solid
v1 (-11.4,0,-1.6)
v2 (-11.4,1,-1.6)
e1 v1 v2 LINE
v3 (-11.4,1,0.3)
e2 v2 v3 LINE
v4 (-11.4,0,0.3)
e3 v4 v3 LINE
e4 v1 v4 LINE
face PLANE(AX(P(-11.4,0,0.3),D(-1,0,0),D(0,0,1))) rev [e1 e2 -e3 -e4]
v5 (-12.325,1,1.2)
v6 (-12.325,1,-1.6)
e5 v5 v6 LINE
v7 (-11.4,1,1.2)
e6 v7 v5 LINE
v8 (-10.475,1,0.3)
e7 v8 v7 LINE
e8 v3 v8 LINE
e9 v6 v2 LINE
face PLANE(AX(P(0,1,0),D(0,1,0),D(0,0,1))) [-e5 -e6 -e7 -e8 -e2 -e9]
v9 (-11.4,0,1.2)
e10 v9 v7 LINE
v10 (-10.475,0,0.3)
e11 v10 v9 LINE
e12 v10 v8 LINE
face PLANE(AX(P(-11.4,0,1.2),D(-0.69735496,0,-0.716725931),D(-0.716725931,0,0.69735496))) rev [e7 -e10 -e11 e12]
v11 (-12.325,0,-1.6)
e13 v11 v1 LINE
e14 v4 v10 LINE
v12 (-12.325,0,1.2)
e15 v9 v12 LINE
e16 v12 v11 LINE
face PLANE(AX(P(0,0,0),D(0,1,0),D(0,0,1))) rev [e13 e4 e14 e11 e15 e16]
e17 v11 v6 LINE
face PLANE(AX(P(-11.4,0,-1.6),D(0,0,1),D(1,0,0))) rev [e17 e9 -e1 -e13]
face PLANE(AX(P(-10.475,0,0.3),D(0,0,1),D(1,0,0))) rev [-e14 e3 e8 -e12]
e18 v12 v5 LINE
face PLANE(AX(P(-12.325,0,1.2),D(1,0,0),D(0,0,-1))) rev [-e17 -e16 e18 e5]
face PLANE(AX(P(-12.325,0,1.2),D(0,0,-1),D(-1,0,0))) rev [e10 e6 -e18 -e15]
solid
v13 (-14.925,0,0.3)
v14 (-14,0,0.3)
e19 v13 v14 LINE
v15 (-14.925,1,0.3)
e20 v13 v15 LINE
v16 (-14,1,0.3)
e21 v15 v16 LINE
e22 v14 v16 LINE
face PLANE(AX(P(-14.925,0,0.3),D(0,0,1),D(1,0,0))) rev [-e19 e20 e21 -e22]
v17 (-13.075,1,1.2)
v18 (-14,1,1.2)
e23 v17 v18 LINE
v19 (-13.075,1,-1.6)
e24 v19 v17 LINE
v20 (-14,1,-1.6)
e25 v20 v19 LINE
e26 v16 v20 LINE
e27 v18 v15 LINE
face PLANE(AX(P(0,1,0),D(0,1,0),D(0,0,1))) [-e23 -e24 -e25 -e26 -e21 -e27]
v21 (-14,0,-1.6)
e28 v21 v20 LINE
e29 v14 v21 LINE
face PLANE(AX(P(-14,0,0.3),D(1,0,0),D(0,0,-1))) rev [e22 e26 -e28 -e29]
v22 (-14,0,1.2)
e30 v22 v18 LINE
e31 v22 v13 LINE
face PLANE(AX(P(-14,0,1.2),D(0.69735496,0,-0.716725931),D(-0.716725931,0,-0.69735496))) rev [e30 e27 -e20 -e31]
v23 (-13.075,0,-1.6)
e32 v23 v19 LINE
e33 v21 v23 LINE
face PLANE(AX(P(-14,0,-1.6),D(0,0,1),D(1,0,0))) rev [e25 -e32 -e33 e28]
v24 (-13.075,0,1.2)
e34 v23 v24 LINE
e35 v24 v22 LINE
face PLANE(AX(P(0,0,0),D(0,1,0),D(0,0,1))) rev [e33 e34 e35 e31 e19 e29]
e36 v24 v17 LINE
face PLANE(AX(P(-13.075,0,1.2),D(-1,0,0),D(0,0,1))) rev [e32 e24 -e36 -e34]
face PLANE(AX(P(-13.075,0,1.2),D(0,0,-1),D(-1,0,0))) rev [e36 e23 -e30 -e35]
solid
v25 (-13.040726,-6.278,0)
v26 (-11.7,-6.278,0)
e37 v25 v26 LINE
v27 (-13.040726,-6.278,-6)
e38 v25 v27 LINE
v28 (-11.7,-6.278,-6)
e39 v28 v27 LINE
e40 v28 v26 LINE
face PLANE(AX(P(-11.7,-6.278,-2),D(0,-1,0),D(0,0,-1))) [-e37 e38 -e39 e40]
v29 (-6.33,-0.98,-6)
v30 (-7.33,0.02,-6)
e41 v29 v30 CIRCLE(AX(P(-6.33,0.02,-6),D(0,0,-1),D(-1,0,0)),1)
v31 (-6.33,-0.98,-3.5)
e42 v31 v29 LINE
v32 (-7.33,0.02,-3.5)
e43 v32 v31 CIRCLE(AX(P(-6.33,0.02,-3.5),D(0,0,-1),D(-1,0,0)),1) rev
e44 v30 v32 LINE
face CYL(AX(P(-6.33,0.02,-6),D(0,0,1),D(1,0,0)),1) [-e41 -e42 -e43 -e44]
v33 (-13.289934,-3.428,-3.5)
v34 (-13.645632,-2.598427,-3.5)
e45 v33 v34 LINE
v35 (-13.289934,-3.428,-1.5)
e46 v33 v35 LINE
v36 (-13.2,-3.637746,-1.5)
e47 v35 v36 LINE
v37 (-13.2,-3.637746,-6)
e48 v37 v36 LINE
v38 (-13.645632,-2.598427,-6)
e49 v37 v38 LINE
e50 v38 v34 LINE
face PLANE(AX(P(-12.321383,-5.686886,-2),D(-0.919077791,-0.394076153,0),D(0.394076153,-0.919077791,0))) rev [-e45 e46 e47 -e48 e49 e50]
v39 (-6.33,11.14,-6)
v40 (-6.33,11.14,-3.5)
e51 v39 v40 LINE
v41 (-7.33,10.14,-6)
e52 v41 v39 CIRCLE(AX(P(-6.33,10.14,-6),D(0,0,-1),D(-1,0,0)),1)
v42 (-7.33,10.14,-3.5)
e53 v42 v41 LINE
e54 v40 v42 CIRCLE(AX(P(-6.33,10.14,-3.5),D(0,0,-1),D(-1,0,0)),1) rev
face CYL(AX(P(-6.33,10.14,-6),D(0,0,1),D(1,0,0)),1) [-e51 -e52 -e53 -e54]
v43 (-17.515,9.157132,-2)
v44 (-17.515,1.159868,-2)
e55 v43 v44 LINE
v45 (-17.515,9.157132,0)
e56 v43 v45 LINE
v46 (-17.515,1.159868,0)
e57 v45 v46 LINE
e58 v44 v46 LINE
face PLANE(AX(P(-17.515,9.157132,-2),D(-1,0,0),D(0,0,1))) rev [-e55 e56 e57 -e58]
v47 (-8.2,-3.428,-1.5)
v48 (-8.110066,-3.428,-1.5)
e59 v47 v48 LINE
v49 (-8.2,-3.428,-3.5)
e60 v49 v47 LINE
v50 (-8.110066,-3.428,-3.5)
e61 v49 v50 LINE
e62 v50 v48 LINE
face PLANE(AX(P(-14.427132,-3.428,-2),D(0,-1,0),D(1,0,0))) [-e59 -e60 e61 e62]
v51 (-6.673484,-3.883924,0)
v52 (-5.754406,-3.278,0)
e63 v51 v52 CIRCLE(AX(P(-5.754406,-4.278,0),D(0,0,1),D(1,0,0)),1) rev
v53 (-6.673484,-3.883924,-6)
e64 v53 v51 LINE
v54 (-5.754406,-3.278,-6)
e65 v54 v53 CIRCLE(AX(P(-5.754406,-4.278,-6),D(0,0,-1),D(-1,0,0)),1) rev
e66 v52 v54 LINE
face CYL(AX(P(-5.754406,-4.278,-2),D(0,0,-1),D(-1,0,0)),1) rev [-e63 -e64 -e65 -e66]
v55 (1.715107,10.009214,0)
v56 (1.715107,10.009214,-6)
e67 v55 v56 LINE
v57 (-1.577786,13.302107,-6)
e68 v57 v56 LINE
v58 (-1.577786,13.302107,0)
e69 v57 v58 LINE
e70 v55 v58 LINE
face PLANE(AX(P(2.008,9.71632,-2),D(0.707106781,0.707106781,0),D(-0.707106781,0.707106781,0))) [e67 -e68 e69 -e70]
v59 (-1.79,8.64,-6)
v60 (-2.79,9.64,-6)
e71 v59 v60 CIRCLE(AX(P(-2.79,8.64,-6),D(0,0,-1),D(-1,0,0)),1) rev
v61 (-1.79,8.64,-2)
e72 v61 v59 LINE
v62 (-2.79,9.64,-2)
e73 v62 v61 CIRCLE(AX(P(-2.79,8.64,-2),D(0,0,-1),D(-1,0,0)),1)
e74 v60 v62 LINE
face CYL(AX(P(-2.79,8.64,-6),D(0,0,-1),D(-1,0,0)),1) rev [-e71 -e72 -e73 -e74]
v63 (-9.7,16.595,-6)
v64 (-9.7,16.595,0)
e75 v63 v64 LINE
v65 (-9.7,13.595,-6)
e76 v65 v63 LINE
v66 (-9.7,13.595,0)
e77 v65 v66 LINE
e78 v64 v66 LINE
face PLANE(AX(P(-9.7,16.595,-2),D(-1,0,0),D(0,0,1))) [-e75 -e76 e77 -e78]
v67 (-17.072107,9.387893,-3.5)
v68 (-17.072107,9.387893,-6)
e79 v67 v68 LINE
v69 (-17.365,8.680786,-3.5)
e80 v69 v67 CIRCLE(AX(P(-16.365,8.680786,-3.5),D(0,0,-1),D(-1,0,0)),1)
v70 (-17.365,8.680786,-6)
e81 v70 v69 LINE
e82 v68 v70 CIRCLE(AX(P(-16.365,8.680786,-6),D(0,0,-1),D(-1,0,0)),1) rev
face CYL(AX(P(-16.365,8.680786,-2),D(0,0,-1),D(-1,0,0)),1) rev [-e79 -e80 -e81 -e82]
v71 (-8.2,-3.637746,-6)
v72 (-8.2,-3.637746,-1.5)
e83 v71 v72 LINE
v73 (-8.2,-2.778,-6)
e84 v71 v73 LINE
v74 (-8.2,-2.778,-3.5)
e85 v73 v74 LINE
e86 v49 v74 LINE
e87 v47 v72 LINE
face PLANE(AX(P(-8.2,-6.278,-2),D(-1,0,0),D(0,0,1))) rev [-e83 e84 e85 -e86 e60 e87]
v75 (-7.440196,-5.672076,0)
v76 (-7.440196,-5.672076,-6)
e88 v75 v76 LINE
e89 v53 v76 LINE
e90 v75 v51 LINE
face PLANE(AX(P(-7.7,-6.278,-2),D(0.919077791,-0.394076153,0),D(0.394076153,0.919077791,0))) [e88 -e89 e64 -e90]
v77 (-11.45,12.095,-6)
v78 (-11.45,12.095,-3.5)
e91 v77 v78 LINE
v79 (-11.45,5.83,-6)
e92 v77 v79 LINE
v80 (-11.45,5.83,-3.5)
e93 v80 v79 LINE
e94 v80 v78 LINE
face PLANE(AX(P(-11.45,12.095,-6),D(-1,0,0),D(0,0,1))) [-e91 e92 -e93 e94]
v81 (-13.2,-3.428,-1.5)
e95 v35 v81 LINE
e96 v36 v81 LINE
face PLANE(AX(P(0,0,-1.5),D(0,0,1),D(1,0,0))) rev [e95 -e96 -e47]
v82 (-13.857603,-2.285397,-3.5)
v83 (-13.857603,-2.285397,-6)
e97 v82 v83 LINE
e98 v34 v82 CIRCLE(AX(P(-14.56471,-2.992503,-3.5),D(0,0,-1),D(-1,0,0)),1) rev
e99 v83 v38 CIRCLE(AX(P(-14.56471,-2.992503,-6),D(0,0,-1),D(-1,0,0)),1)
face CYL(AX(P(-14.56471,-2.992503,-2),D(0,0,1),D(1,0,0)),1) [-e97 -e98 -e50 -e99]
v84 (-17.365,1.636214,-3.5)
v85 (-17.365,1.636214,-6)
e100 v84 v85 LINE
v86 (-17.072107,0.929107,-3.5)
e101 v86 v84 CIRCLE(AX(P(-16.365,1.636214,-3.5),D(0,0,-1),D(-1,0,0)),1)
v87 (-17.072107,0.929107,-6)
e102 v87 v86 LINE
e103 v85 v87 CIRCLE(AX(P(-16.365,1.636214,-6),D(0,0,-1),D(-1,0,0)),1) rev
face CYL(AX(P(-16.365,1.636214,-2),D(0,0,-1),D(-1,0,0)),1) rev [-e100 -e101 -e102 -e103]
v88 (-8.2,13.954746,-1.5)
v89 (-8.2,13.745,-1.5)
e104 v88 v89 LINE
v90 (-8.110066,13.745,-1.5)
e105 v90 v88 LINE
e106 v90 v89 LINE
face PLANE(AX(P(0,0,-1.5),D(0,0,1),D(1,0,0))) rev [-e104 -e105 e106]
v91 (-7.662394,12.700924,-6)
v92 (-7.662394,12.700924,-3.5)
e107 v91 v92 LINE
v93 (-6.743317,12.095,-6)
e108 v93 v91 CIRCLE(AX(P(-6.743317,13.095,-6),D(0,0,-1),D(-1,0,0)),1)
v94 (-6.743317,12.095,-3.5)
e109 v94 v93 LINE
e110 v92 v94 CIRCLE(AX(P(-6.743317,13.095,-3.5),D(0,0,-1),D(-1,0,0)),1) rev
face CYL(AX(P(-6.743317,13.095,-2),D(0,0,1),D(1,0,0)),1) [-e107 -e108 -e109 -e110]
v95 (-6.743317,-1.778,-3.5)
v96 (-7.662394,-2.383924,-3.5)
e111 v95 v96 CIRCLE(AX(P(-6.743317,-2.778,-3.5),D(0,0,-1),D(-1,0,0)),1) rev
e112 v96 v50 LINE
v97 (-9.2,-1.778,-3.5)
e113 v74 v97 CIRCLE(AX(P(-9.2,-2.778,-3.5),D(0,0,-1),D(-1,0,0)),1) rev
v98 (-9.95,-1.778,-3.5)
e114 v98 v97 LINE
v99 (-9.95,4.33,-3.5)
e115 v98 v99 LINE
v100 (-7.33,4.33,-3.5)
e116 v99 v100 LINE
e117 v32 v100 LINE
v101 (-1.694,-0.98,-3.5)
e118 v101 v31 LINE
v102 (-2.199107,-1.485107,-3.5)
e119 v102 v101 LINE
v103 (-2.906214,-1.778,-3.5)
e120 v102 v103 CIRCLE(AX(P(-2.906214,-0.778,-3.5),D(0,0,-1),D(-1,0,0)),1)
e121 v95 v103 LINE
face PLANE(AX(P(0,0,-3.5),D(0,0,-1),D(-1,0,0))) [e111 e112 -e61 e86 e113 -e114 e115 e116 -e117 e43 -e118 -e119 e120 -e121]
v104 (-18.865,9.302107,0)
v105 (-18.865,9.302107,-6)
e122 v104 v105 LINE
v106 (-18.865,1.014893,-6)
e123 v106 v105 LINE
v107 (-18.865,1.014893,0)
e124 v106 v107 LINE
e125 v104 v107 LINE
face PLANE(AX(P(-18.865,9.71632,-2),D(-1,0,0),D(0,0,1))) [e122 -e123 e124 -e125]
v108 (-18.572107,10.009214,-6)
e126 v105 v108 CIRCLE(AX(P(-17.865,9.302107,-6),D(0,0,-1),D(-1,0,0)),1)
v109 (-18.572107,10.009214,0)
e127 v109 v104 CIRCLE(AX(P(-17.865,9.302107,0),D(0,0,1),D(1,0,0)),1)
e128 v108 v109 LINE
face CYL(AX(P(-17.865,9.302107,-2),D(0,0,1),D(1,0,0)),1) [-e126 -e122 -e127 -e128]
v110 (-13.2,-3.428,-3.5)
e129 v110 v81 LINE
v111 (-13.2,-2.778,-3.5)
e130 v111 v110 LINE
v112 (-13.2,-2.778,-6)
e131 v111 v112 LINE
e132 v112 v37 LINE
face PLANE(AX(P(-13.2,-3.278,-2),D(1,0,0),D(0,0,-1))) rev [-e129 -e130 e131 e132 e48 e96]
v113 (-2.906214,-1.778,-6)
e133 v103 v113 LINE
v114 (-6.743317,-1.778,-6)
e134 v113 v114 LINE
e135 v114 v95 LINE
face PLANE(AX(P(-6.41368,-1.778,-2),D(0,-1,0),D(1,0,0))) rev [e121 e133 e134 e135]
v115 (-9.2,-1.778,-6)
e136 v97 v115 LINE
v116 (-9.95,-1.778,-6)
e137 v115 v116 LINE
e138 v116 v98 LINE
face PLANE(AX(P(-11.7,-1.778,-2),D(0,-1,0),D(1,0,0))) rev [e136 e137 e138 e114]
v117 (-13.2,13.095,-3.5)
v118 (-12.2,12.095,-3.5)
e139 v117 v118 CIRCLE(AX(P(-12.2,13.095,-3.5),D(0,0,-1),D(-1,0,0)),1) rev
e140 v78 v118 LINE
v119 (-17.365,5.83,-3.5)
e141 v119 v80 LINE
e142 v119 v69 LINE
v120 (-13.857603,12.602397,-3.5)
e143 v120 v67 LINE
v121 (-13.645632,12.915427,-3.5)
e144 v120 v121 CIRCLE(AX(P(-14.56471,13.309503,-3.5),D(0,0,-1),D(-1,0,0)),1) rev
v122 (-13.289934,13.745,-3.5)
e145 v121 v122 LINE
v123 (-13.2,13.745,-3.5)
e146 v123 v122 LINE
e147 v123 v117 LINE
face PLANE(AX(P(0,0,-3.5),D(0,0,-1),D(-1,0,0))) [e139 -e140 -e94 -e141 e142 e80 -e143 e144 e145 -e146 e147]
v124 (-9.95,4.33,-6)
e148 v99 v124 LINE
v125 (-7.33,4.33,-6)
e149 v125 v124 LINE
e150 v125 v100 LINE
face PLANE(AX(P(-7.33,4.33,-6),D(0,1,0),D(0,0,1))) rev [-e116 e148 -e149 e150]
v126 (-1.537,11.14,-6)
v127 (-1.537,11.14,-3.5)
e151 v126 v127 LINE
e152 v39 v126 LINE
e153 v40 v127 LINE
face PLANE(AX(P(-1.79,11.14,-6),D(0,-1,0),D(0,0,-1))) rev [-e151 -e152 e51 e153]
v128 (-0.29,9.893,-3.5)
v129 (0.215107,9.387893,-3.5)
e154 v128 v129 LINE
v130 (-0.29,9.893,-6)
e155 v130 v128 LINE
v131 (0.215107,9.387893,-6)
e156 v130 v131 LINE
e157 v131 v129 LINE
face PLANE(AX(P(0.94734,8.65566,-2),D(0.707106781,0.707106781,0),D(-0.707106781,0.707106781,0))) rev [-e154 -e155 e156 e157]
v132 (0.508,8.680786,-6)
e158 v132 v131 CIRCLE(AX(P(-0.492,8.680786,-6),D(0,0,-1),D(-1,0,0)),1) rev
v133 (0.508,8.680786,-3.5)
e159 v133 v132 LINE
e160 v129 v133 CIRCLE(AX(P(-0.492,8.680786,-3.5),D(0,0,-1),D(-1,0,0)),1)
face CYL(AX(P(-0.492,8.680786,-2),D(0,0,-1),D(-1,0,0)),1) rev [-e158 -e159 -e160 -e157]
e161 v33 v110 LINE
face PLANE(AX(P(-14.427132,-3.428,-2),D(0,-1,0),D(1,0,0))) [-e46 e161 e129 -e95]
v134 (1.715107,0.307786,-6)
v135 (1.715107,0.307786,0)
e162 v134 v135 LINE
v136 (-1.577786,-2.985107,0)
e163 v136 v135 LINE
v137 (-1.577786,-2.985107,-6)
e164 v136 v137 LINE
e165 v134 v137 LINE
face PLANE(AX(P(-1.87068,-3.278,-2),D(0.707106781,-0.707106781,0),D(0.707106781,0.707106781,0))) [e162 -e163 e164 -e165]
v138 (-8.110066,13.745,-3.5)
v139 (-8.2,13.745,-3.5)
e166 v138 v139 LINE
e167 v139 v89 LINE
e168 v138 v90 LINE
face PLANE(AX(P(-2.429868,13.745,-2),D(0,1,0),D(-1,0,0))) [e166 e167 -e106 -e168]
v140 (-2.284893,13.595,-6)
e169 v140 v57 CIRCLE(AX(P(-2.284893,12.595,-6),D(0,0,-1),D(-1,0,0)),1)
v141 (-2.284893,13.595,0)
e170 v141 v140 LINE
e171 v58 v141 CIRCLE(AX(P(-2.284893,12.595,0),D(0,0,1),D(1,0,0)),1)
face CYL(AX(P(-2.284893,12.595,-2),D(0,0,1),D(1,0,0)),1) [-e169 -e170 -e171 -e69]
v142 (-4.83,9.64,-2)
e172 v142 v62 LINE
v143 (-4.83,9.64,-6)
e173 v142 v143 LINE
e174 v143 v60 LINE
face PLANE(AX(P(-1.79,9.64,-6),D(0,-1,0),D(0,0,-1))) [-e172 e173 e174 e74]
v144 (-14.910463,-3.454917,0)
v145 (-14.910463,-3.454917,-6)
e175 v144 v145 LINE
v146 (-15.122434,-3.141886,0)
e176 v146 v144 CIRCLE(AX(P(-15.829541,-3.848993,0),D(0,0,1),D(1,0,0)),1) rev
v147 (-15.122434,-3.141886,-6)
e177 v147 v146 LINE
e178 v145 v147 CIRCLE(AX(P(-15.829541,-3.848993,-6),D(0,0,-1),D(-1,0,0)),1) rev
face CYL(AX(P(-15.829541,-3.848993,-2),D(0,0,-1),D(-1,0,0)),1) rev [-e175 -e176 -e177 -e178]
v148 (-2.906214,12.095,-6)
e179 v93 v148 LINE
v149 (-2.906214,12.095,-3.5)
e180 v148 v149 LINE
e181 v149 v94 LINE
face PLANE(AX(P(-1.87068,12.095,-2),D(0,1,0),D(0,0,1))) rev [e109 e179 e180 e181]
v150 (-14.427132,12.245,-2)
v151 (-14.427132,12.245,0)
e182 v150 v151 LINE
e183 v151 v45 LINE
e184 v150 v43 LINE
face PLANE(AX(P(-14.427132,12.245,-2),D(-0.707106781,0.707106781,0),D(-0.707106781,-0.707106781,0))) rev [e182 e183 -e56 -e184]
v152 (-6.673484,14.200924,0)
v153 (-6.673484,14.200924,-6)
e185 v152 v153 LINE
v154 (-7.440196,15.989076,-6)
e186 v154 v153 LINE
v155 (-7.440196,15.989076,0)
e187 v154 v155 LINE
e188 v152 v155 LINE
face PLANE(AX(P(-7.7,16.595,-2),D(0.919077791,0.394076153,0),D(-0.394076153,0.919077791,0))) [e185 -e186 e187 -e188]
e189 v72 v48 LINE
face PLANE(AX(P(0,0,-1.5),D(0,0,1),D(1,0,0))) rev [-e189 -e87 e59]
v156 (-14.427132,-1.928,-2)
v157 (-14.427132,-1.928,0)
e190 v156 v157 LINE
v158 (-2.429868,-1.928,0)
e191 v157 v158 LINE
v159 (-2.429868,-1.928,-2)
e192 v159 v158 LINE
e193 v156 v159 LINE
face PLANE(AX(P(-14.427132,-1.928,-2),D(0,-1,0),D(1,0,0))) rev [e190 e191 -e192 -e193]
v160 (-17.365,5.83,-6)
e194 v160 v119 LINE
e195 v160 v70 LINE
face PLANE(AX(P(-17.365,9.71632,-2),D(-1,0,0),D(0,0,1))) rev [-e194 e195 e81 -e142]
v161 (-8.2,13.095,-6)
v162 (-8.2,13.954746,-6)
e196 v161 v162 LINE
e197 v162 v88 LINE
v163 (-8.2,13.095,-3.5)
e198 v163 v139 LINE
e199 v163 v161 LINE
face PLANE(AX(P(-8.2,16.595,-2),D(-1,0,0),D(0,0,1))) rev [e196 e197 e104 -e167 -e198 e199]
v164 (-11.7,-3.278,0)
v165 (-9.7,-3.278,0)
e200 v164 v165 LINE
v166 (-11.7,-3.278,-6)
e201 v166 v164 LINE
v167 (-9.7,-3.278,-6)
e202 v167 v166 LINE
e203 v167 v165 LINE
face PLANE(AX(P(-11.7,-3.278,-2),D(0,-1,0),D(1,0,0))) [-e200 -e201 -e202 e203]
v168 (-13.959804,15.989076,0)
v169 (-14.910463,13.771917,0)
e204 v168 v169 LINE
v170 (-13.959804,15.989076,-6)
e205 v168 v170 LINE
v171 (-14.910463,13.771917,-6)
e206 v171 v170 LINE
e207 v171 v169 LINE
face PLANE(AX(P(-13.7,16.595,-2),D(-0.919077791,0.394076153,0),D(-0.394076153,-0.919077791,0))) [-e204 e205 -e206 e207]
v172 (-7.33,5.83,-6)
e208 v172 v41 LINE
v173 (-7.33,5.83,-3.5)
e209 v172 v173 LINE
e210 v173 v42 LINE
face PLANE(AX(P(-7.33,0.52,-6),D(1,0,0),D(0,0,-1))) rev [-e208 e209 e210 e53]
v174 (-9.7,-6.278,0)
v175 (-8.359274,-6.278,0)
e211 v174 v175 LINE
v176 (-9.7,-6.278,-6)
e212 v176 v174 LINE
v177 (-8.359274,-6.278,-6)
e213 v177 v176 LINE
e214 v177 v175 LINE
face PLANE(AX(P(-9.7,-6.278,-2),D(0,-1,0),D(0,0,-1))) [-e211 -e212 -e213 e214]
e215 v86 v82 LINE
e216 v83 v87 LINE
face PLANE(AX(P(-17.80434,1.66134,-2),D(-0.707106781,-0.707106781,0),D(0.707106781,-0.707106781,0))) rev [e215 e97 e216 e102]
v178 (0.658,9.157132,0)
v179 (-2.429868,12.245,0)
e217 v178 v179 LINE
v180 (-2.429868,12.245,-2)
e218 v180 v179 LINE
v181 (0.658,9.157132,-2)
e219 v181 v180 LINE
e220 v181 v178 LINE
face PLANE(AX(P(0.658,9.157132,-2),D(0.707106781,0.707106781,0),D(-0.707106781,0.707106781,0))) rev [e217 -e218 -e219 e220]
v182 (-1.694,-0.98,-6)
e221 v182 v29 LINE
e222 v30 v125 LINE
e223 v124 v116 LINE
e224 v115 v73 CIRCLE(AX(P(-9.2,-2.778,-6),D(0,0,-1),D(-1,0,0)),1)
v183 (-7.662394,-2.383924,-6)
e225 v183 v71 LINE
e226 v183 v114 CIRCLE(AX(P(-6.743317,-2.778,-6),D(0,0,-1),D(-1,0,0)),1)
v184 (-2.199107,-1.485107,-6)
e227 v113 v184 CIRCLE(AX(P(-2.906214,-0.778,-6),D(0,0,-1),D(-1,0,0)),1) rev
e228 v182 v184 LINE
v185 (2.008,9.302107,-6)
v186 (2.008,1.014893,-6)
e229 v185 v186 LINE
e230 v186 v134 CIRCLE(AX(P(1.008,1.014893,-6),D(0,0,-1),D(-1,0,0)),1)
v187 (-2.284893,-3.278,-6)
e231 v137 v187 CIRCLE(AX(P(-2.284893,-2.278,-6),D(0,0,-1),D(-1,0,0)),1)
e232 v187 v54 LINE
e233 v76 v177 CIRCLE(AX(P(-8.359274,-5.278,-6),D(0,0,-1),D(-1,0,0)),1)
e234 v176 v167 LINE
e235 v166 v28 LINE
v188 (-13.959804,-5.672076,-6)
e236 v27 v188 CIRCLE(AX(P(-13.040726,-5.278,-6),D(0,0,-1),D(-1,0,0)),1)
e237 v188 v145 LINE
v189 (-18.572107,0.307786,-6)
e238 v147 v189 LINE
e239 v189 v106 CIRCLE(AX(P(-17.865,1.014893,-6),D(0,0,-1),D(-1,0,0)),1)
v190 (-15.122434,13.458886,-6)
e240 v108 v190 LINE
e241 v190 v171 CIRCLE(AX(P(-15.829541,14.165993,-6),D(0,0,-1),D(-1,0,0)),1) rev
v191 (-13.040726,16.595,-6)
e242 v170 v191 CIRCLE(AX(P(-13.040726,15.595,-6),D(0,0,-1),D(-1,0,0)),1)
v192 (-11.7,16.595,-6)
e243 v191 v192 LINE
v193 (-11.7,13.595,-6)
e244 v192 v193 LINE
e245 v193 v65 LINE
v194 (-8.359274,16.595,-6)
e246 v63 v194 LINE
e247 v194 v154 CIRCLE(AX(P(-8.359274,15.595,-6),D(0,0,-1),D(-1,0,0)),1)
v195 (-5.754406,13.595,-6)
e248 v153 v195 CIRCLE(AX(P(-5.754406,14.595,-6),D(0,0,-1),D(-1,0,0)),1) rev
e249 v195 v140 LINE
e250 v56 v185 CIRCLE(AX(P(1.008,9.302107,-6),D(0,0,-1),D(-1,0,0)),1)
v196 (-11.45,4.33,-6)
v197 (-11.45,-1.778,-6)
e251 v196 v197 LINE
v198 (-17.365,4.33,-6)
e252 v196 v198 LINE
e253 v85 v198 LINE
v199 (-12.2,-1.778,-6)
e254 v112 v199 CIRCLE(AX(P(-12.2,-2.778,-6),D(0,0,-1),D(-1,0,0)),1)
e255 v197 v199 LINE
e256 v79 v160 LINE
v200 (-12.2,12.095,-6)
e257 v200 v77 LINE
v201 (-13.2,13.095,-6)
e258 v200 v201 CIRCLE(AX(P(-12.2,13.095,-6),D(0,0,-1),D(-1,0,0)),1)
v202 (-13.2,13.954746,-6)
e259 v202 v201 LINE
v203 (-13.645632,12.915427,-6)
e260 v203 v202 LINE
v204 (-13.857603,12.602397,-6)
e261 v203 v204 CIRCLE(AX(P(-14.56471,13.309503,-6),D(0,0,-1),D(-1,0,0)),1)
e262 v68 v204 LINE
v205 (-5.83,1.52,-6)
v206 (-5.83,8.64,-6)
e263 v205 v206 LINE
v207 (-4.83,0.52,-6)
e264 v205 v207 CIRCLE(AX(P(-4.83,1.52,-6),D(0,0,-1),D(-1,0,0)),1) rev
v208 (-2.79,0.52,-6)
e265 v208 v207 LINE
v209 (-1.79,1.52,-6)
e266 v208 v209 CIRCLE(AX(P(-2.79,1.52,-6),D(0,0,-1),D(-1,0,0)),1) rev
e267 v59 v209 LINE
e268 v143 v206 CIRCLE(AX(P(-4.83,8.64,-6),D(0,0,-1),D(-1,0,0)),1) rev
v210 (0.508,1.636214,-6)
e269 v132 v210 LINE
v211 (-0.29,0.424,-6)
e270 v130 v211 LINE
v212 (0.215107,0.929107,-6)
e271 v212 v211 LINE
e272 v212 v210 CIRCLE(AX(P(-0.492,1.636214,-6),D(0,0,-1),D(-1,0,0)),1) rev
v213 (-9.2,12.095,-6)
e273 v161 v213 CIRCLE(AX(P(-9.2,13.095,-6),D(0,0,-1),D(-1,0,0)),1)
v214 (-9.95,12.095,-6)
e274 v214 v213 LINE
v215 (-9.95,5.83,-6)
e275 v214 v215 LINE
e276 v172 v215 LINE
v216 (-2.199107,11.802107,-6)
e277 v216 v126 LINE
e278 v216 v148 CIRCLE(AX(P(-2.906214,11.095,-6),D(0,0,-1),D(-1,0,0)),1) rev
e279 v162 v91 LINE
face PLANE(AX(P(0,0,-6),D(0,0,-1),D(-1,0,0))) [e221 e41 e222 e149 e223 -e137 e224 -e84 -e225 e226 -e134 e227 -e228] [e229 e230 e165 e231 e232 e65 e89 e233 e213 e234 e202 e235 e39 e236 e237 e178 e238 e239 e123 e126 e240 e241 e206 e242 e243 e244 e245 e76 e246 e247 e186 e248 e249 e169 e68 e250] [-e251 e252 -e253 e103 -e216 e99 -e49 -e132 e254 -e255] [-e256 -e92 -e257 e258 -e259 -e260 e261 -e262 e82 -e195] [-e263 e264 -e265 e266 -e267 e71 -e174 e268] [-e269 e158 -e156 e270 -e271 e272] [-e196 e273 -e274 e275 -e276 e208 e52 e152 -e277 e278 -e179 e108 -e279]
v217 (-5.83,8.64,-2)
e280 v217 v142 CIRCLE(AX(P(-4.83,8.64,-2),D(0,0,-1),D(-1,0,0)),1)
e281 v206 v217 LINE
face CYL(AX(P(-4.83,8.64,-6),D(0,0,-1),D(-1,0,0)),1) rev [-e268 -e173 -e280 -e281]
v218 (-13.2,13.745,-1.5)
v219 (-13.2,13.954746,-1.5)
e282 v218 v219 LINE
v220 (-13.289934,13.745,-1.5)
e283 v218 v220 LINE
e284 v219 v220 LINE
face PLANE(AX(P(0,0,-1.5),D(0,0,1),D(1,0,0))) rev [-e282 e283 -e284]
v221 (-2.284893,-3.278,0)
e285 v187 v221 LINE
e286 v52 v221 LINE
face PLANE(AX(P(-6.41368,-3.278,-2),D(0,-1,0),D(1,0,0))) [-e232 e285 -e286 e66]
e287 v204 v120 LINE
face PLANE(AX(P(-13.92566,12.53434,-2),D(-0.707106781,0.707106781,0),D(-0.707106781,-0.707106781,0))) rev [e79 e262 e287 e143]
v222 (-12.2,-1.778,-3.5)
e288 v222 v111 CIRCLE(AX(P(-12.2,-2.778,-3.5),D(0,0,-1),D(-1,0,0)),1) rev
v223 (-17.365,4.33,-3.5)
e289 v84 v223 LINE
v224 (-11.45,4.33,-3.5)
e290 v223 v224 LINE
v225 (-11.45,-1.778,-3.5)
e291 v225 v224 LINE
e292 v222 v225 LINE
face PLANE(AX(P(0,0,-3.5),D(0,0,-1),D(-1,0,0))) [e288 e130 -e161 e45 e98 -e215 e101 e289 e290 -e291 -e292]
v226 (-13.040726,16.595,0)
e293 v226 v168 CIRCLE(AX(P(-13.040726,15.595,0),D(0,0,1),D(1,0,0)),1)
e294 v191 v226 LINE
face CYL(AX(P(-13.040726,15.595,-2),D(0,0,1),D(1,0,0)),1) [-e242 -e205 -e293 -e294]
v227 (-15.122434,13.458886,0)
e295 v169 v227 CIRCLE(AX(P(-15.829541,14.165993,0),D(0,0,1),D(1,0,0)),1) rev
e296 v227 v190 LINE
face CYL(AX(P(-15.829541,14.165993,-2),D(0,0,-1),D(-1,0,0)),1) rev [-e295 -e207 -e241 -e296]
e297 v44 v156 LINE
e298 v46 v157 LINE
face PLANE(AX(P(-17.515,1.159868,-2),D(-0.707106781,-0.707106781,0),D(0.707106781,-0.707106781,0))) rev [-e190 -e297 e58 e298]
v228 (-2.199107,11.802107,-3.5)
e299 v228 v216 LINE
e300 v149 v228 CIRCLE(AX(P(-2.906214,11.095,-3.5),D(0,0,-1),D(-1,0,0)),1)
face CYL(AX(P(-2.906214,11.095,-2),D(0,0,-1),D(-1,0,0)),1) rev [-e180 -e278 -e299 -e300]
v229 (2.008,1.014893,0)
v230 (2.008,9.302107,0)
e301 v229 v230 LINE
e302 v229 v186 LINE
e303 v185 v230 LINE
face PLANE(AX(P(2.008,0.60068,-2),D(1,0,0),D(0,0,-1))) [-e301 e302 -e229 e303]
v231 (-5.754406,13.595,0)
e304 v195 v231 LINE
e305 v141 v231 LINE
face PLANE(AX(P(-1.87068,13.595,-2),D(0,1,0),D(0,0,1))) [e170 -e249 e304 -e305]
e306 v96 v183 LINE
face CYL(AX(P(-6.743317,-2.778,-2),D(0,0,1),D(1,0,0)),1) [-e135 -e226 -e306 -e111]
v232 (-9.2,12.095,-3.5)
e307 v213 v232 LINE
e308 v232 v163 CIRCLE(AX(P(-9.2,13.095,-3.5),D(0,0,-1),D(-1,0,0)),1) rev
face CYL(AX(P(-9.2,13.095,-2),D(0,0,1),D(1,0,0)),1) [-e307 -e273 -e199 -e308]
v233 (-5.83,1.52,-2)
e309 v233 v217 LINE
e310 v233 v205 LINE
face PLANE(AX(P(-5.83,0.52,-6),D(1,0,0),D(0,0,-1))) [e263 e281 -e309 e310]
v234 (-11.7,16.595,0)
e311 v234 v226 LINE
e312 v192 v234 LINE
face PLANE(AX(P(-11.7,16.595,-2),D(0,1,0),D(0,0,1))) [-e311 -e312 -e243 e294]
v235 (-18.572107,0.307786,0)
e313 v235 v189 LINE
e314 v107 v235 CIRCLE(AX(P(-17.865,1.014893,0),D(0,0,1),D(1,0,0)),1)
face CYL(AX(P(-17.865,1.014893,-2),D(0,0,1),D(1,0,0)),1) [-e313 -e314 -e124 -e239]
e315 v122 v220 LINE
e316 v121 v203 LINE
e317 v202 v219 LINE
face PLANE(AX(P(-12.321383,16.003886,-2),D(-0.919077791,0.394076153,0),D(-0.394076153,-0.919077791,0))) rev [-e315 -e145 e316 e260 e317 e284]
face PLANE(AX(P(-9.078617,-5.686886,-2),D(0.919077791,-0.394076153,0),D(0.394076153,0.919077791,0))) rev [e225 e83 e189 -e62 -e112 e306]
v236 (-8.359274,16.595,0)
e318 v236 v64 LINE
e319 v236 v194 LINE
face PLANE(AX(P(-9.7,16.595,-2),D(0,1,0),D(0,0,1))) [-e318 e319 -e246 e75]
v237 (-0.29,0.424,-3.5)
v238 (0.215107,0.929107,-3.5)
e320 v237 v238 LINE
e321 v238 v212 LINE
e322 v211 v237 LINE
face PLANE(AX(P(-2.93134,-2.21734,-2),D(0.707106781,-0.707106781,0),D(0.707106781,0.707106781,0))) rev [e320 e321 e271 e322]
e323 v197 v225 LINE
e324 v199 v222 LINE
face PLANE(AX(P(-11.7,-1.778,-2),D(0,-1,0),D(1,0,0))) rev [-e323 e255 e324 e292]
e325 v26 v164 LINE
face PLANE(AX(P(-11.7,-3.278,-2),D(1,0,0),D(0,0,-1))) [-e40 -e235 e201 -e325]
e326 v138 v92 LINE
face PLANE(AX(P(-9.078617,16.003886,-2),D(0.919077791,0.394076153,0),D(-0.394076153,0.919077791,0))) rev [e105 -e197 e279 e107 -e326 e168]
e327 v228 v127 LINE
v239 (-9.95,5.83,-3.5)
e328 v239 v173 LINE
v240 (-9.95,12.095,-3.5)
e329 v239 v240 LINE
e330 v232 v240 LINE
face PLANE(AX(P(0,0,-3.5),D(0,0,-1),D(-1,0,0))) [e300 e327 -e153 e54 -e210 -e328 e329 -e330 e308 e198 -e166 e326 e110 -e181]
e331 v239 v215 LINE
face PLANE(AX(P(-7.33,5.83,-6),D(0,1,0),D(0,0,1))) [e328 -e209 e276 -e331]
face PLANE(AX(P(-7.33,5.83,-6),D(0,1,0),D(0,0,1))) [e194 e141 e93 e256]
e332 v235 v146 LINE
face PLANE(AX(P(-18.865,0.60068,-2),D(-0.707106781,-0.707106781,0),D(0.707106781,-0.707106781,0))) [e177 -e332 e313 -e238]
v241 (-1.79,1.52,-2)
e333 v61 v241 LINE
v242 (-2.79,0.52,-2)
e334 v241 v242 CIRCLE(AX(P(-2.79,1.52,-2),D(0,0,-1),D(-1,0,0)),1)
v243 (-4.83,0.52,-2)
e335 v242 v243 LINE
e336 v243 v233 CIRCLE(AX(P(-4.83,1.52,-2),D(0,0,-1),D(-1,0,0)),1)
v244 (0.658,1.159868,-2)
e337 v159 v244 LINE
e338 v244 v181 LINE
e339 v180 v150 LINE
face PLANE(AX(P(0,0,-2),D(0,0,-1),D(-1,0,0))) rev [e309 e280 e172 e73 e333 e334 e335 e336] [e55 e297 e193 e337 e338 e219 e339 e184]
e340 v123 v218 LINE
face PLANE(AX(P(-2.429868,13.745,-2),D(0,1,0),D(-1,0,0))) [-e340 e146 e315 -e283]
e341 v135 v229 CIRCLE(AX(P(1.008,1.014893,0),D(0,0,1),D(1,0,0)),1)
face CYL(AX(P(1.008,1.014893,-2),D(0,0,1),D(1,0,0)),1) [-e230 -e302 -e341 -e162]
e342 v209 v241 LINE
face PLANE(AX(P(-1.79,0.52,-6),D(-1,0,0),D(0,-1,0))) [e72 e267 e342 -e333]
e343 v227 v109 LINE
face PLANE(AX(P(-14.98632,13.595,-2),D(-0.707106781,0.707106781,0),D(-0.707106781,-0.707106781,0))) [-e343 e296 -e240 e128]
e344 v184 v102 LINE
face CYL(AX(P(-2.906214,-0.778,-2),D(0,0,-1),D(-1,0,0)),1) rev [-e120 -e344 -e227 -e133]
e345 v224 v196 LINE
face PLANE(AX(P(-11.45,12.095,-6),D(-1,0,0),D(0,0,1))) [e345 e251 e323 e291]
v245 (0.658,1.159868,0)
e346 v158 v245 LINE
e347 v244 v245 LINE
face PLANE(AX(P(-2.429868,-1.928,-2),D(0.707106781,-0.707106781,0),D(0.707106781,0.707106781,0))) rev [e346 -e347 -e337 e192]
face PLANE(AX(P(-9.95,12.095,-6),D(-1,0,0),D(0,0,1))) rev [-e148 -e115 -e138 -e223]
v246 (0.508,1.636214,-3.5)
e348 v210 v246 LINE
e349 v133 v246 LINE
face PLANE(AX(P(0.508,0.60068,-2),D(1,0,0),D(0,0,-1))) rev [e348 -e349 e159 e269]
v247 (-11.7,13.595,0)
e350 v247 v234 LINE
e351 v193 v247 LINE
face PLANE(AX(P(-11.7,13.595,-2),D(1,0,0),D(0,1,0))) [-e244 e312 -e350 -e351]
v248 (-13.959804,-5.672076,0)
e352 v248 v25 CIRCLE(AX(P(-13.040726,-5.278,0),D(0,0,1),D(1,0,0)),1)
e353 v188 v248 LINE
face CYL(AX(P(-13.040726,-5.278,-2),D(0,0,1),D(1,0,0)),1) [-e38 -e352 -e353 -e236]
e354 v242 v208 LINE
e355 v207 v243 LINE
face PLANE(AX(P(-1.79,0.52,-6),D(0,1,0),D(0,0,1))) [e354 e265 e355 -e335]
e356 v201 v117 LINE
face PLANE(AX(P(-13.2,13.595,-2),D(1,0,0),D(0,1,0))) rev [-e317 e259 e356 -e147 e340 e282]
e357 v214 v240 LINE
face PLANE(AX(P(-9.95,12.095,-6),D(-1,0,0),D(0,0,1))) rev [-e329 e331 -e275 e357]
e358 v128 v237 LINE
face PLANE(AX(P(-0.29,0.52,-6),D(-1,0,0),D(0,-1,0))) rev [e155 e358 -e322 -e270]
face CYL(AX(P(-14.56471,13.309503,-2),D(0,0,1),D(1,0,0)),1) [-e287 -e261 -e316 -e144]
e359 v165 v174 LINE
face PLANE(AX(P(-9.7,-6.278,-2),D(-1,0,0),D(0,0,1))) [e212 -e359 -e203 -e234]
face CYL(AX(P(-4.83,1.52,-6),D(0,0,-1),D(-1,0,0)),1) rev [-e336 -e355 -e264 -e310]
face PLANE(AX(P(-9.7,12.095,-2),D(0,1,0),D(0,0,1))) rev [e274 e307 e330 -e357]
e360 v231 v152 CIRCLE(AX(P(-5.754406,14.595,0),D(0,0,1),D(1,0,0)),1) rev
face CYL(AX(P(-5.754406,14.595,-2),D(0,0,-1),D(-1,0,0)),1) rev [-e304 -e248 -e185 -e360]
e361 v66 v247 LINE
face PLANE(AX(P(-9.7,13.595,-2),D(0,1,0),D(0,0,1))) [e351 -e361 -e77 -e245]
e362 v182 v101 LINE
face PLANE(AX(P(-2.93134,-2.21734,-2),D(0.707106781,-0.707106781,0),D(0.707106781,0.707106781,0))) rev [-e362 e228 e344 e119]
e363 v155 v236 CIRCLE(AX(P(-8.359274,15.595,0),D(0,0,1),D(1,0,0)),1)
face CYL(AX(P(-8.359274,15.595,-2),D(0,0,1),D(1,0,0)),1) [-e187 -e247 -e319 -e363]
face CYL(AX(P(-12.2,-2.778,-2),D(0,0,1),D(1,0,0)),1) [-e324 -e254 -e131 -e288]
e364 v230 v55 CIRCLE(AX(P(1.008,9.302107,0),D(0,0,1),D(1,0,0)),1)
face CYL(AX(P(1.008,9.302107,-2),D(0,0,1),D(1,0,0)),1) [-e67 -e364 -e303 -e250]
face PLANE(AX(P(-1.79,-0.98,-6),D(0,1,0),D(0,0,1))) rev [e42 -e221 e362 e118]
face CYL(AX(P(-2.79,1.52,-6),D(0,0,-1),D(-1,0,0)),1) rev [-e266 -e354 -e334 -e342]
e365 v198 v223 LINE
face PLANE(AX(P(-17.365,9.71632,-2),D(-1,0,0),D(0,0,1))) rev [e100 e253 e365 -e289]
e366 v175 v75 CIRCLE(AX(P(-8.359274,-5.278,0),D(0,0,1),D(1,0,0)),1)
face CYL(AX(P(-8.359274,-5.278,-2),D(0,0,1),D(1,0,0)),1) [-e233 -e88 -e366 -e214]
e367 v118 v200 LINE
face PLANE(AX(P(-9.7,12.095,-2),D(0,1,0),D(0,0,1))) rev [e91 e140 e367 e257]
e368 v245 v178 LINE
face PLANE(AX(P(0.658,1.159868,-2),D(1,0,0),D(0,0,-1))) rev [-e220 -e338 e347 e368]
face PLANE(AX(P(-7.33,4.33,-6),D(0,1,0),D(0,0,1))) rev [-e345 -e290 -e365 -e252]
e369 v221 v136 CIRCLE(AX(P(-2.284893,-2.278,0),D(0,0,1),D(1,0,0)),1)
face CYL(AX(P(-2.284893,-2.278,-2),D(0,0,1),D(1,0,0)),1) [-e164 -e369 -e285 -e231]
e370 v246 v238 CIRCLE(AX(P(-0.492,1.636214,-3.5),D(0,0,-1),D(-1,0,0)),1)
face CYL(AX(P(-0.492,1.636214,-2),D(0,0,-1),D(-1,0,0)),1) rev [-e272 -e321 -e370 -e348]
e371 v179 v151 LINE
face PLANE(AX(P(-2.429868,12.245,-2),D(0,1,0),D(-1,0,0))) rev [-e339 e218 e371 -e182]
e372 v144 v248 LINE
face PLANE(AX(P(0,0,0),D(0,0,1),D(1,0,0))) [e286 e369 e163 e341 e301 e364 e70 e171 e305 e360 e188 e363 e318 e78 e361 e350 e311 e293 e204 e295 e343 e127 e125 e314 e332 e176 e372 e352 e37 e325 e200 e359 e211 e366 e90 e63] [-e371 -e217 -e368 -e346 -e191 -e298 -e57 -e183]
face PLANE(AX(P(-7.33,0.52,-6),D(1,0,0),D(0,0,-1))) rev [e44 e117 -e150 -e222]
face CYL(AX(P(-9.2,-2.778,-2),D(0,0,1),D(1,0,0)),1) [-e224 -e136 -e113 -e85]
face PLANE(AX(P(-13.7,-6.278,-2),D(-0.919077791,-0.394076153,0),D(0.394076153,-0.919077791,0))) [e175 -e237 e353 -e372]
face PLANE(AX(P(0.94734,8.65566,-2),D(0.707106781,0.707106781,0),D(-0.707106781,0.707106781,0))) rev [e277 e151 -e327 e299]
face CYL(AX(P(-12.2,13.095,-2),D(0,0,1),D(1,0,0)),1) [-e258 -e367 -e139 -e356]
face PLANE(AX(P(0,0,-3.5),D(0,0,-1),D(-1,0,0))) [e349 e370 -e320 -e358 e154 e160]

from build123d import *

# Parameters (mm, degrees)
BOSS_EXTRU_1_DEPTH   = 2
ESQUISSE2_W          = 4.04
ESQUISSE2_H          = 9.12
BOSS_EXTRU_2_DEPTH   = 4
BOSS_EXTRU_3_DEPTH   = 0.5
BOSS_EXTRU_3_2_DEPTH = 0.5
COQUE1_START         = -6
COQUE1_DEPTH         = 2.5
COQUE1_START_2       = -3.5
COQUE1_2_DEPTH       = 2
CONG_1_R             = 1
NERVURE1_REACH       = 28.137
ESQUISSE5_WALLS_W    = 1.5
ESQUISSE5_WALLS_H    = 68.146214938
NERVURE2_START       = -2.5
NERVURE2_OUTLINE_W   = 5.915
NERVURE2_OUTLINE_H   = 1.5
NERVURE2_OUTLINE_W_2 = 2.62
NERVURE2_DEPTH       = 2.5


# Read off the part's stored shape, not the designer's step: Coque1, Nervure2
with BuildPart() as part:
    # Esquisse1 → Boss.-Extru.1 (new body)
    with BuildSketch(Plane.XY):
        Polygon((2.008, 0.600679656), (2.008, 9.716320344), (-1.870679656, 13.595), (-6.413679656, 13.595), (-7.7, 16.595), (-9.7, 16.595), (-9.7, 13.595), (-11.7, 13.595), (-11.7, 16.595), (-13.7, 16.595), (-14.986320344, 13.595), (-18.865, 9.716320344), (-18.865, 0.600679656), (-14.986320344, -3.278), (-13.7, -6.278), (-11.7, -6.278), (-11.7, -3.278), (-9.7, -3.278), (-9.7, -6.278), (-7.7, -6.278), (-6.413679656, -3.278), (-1.870679656, -3.278), align=None)
        Polygon((0.658, 1.159867966), (0.658, 9.157132034), (-2.429867966, 12.245), (-14.427132034, 12.245), (-17.515, 9.157132034), (-17.515, 1.159867966), (-14.427132034, -1.928), (-2.429867966, -1.928), align=None, mode=Mode.SUBTRACT)
    extrude(amount=-BOSS_EXTRU_1_DEPTH)

    # Esquisse2 → Boss.-Extru.2 (add)
    with BuildSketch(Plane(origin=(0, 0, -2), x_dir=(-1, 0, 0), z_dir=(0, 0, -1))):
        Polygon((-2.008, 0.600679656), (1.870679656, -3.278), (6.413679656, -3.278), (7.7, -6.278), (9.7, -6.278), (9.7, -3.278), (11.7, -3.278), (11.7, -6.278), (13.7, -6.278), (14.986320344, -3.278), (18.865, 0.600679656), (18.865, 9.716320344), (14.986320344, 13.595), (13.7, 16.595), (11.7, 16.595), (11.7, 13.595), (9.7, 13.595), (9.7, 16.595), (7.7, 16.595), (6.413679656, 13.595), (1.870679656, 13.595), (-2.008, 9.716320344), align=None)
        with Locations((3.81, 5.08)):
            Rectangle(ESQUISSE2_W, ESQUISSE2_H, mode=Mode.SUBTRACT)
    extrude(amount=BOSS_EXTRU_2_DEPTH)

    # Coque1 outline → Coque1 (cut)
    with BuildSketch(Plane.XY.offset(COQUE1_START)):
        Polygon((-7.33, -0.98), (-7.33, 11.14), (-1.537, 11.14), (-2.492, 12.095), (-7.402590257, 12.095), (-8.2, 13.954746089), (-8.2, 12.095), (-13.2, 12.095), (-13.2, 13.954746089), (-13.721489547, 12.738510453), (-17.365, 9.095), (-17.365, 1.222), (-13.721489547, -2.421510453), (-13.2, -3.637746089), (-13.2, -1.778), (-8.2, -1.778), (-8.2, -3.637746089), (-7.402590257, -1.778), (-2.492, -1.778), (-1.694, -0.98), align=None)
        Polygon((-0.29, 9.893), (-0.29, 0.424), (0.508, 1.222), (0.508, 9.095), align=None)
    extrude(amount=COQUE1_DEPTH, mode=Mode.SUBTRACT)

    # Coque1 2 outline → Coque1 2 (cut)
    with BuildSketch(Plane.XY.offset(COQUE1_START_2)):
        Polygon((-8.2, 13.745), (-8.110066446, 13.745), (-8.2, 13.954746089), align=None)
        Polygon((-8.2, -3.637746089), (-8.110066446, -3.428), (-8.2, -3.428), align=None)
        Polygon((-13.289933554, 13.745), (-13.2, 13.745), (-13.2, 13.954746089), align=None)
        Polygon((-13.2, -3.637746089), (-13.2, -3.428), (-13.289933554, -3.428), align=None)
    extrude(amount=COQUE1_2_DEPTH, mode=Mode.SUBTRACT)

    # Congé1
    cong_1_edges = [part.edges().sort_by_distance(p)[0] for p in [
        (-1.79, 0.52, -4),
        (-5.83, 0.52, -4),
        (-5.83, 9.64, -4),
        (-1.79, 9.64, -4),
        (0.508, 1.222, -4.75),
        (0.508, 9.095, -4.75),
        (-7.33, 11.14, -4.75),
        (-7.33, -0.98, -4.75),
        (-8.2, 12.095, -4.75),
        (-13.721489547, 12.738510453, -4.75),
        (-17.365, 1.222, -4.75),
        (-13.2, -1.778, -4.75),
        (-7.402590257, -1.778, -4.75),
        (-2.492, 12.095, -4.75),
        (-2.492, -1.778, -4.75),
        (-7.402590257, 12.095, -4.75),
        (-8.2, -1.778, -4.75),
        (-13.721489547, -2.421510453, -4.75),
        (-13.2, 12.095, -4.75),
        (-17.365, 9.095, -4.75),
        (-1.870679656, -3.278, -3),
        (-6.413679656, -3.278, -3),
        (-7.7, -6.278, -3),
        (-13.7, -6.278, -3),
        (-14.986320344, -3.278, -3),
        (-18.865, 0.600679656, -3),
        (-18.865, 9.716320344, -3),
        (-14.986320344, 13.595, -3),
        (-13.7, 16.595, -3),
        (-7.7, 16.595, -3),
        (-6.413679656, 13.595, -3),
        (-1.870679656, 13.595, -3),
        (2.008, 9.716320344, -3),
        (2.008, 0.600679656, -3),
    ]]
    fillet(cong_1_edges, radius=CONG_1_R)

    # Esquisse5 walls → Nervure1 (add, up to next)
    with BuildSketch(Plane(origin=(0, 0, -6), x_dir=(-1, 0, 0), z_dir=(0, 0, -1)), mode=Mode.PRIVATE) as nervure1_sk1:
        with Locations((10.7, 5.1585)):
            Rectangle(ESQUISSE5_WALLS_W, ESQUISSE5_WALLS_H)
    nervure1_tool1 = extrude(nervure1_sk1.sketch, amount=-NERVURE1_REACH, mode=Mode.PRIVATE) - part.part
    add(nervure1_tool1.solids().sort_by_distance((-10.7, 5.1585, -6))[0])

    # Nervure2 outline → Nervure2 (add)
    with BuildSketch(Plane(origin=(0, 0, -6), x_dir=(-1, 0, 0), z_dir=(0, 0, -1)).offset(NERVURE2_START)):
        with Locations((14.4075, 5.08)):
            Rectangle(NERVURE2_OUTLINE_W, NERVURE2_OUTLINE_H)
        with Locations((8.64, 5.08)):
            Rectangle(NERVURE2_OUTLINE_W_2, NERVURE2_OUTLINE_H)
    extrude(amount=NERVURE2_DEPTH)


with BuildPart() as body_2:
    # Esquisse4 → Boss.-Extru.3 (new, symmetric)
    with BuildSketch(Plane(origin=(0, 0.5, 0), x_dir=(-1, 0, 0), z_dir=(0, -1, 0))):
        Polygon((12.325, -1.2), (12.325, 1.6), (11.4, 1.6), (11.4, -0.3), (10.475, -0.3), (11.4, -1.2), align=None)
    extrude(amount=BOSS_EXTRU_3_DEPTH, both=True)


with BuildPart() as body_3:
    # Esquisse4 → Boss.-Extru.3 2 (new, symmetric)
    with BuildSketch(Plane(origin=(0, 0.5, 0), x_dir=(-1, 0, 0), z_dir=(0, -1, 0))):
        Polygon((14, -0.3), (14, 1.6), (13.075, 1.6), (13.075, -1.2), (14, -1.2), (14.925, -0.3), align=None)
    extrude(amount=BOSS_EXTRU_3_2_DEPTH, both=True)


solid = Compound([part.part, body_2.part, body_3.part])
